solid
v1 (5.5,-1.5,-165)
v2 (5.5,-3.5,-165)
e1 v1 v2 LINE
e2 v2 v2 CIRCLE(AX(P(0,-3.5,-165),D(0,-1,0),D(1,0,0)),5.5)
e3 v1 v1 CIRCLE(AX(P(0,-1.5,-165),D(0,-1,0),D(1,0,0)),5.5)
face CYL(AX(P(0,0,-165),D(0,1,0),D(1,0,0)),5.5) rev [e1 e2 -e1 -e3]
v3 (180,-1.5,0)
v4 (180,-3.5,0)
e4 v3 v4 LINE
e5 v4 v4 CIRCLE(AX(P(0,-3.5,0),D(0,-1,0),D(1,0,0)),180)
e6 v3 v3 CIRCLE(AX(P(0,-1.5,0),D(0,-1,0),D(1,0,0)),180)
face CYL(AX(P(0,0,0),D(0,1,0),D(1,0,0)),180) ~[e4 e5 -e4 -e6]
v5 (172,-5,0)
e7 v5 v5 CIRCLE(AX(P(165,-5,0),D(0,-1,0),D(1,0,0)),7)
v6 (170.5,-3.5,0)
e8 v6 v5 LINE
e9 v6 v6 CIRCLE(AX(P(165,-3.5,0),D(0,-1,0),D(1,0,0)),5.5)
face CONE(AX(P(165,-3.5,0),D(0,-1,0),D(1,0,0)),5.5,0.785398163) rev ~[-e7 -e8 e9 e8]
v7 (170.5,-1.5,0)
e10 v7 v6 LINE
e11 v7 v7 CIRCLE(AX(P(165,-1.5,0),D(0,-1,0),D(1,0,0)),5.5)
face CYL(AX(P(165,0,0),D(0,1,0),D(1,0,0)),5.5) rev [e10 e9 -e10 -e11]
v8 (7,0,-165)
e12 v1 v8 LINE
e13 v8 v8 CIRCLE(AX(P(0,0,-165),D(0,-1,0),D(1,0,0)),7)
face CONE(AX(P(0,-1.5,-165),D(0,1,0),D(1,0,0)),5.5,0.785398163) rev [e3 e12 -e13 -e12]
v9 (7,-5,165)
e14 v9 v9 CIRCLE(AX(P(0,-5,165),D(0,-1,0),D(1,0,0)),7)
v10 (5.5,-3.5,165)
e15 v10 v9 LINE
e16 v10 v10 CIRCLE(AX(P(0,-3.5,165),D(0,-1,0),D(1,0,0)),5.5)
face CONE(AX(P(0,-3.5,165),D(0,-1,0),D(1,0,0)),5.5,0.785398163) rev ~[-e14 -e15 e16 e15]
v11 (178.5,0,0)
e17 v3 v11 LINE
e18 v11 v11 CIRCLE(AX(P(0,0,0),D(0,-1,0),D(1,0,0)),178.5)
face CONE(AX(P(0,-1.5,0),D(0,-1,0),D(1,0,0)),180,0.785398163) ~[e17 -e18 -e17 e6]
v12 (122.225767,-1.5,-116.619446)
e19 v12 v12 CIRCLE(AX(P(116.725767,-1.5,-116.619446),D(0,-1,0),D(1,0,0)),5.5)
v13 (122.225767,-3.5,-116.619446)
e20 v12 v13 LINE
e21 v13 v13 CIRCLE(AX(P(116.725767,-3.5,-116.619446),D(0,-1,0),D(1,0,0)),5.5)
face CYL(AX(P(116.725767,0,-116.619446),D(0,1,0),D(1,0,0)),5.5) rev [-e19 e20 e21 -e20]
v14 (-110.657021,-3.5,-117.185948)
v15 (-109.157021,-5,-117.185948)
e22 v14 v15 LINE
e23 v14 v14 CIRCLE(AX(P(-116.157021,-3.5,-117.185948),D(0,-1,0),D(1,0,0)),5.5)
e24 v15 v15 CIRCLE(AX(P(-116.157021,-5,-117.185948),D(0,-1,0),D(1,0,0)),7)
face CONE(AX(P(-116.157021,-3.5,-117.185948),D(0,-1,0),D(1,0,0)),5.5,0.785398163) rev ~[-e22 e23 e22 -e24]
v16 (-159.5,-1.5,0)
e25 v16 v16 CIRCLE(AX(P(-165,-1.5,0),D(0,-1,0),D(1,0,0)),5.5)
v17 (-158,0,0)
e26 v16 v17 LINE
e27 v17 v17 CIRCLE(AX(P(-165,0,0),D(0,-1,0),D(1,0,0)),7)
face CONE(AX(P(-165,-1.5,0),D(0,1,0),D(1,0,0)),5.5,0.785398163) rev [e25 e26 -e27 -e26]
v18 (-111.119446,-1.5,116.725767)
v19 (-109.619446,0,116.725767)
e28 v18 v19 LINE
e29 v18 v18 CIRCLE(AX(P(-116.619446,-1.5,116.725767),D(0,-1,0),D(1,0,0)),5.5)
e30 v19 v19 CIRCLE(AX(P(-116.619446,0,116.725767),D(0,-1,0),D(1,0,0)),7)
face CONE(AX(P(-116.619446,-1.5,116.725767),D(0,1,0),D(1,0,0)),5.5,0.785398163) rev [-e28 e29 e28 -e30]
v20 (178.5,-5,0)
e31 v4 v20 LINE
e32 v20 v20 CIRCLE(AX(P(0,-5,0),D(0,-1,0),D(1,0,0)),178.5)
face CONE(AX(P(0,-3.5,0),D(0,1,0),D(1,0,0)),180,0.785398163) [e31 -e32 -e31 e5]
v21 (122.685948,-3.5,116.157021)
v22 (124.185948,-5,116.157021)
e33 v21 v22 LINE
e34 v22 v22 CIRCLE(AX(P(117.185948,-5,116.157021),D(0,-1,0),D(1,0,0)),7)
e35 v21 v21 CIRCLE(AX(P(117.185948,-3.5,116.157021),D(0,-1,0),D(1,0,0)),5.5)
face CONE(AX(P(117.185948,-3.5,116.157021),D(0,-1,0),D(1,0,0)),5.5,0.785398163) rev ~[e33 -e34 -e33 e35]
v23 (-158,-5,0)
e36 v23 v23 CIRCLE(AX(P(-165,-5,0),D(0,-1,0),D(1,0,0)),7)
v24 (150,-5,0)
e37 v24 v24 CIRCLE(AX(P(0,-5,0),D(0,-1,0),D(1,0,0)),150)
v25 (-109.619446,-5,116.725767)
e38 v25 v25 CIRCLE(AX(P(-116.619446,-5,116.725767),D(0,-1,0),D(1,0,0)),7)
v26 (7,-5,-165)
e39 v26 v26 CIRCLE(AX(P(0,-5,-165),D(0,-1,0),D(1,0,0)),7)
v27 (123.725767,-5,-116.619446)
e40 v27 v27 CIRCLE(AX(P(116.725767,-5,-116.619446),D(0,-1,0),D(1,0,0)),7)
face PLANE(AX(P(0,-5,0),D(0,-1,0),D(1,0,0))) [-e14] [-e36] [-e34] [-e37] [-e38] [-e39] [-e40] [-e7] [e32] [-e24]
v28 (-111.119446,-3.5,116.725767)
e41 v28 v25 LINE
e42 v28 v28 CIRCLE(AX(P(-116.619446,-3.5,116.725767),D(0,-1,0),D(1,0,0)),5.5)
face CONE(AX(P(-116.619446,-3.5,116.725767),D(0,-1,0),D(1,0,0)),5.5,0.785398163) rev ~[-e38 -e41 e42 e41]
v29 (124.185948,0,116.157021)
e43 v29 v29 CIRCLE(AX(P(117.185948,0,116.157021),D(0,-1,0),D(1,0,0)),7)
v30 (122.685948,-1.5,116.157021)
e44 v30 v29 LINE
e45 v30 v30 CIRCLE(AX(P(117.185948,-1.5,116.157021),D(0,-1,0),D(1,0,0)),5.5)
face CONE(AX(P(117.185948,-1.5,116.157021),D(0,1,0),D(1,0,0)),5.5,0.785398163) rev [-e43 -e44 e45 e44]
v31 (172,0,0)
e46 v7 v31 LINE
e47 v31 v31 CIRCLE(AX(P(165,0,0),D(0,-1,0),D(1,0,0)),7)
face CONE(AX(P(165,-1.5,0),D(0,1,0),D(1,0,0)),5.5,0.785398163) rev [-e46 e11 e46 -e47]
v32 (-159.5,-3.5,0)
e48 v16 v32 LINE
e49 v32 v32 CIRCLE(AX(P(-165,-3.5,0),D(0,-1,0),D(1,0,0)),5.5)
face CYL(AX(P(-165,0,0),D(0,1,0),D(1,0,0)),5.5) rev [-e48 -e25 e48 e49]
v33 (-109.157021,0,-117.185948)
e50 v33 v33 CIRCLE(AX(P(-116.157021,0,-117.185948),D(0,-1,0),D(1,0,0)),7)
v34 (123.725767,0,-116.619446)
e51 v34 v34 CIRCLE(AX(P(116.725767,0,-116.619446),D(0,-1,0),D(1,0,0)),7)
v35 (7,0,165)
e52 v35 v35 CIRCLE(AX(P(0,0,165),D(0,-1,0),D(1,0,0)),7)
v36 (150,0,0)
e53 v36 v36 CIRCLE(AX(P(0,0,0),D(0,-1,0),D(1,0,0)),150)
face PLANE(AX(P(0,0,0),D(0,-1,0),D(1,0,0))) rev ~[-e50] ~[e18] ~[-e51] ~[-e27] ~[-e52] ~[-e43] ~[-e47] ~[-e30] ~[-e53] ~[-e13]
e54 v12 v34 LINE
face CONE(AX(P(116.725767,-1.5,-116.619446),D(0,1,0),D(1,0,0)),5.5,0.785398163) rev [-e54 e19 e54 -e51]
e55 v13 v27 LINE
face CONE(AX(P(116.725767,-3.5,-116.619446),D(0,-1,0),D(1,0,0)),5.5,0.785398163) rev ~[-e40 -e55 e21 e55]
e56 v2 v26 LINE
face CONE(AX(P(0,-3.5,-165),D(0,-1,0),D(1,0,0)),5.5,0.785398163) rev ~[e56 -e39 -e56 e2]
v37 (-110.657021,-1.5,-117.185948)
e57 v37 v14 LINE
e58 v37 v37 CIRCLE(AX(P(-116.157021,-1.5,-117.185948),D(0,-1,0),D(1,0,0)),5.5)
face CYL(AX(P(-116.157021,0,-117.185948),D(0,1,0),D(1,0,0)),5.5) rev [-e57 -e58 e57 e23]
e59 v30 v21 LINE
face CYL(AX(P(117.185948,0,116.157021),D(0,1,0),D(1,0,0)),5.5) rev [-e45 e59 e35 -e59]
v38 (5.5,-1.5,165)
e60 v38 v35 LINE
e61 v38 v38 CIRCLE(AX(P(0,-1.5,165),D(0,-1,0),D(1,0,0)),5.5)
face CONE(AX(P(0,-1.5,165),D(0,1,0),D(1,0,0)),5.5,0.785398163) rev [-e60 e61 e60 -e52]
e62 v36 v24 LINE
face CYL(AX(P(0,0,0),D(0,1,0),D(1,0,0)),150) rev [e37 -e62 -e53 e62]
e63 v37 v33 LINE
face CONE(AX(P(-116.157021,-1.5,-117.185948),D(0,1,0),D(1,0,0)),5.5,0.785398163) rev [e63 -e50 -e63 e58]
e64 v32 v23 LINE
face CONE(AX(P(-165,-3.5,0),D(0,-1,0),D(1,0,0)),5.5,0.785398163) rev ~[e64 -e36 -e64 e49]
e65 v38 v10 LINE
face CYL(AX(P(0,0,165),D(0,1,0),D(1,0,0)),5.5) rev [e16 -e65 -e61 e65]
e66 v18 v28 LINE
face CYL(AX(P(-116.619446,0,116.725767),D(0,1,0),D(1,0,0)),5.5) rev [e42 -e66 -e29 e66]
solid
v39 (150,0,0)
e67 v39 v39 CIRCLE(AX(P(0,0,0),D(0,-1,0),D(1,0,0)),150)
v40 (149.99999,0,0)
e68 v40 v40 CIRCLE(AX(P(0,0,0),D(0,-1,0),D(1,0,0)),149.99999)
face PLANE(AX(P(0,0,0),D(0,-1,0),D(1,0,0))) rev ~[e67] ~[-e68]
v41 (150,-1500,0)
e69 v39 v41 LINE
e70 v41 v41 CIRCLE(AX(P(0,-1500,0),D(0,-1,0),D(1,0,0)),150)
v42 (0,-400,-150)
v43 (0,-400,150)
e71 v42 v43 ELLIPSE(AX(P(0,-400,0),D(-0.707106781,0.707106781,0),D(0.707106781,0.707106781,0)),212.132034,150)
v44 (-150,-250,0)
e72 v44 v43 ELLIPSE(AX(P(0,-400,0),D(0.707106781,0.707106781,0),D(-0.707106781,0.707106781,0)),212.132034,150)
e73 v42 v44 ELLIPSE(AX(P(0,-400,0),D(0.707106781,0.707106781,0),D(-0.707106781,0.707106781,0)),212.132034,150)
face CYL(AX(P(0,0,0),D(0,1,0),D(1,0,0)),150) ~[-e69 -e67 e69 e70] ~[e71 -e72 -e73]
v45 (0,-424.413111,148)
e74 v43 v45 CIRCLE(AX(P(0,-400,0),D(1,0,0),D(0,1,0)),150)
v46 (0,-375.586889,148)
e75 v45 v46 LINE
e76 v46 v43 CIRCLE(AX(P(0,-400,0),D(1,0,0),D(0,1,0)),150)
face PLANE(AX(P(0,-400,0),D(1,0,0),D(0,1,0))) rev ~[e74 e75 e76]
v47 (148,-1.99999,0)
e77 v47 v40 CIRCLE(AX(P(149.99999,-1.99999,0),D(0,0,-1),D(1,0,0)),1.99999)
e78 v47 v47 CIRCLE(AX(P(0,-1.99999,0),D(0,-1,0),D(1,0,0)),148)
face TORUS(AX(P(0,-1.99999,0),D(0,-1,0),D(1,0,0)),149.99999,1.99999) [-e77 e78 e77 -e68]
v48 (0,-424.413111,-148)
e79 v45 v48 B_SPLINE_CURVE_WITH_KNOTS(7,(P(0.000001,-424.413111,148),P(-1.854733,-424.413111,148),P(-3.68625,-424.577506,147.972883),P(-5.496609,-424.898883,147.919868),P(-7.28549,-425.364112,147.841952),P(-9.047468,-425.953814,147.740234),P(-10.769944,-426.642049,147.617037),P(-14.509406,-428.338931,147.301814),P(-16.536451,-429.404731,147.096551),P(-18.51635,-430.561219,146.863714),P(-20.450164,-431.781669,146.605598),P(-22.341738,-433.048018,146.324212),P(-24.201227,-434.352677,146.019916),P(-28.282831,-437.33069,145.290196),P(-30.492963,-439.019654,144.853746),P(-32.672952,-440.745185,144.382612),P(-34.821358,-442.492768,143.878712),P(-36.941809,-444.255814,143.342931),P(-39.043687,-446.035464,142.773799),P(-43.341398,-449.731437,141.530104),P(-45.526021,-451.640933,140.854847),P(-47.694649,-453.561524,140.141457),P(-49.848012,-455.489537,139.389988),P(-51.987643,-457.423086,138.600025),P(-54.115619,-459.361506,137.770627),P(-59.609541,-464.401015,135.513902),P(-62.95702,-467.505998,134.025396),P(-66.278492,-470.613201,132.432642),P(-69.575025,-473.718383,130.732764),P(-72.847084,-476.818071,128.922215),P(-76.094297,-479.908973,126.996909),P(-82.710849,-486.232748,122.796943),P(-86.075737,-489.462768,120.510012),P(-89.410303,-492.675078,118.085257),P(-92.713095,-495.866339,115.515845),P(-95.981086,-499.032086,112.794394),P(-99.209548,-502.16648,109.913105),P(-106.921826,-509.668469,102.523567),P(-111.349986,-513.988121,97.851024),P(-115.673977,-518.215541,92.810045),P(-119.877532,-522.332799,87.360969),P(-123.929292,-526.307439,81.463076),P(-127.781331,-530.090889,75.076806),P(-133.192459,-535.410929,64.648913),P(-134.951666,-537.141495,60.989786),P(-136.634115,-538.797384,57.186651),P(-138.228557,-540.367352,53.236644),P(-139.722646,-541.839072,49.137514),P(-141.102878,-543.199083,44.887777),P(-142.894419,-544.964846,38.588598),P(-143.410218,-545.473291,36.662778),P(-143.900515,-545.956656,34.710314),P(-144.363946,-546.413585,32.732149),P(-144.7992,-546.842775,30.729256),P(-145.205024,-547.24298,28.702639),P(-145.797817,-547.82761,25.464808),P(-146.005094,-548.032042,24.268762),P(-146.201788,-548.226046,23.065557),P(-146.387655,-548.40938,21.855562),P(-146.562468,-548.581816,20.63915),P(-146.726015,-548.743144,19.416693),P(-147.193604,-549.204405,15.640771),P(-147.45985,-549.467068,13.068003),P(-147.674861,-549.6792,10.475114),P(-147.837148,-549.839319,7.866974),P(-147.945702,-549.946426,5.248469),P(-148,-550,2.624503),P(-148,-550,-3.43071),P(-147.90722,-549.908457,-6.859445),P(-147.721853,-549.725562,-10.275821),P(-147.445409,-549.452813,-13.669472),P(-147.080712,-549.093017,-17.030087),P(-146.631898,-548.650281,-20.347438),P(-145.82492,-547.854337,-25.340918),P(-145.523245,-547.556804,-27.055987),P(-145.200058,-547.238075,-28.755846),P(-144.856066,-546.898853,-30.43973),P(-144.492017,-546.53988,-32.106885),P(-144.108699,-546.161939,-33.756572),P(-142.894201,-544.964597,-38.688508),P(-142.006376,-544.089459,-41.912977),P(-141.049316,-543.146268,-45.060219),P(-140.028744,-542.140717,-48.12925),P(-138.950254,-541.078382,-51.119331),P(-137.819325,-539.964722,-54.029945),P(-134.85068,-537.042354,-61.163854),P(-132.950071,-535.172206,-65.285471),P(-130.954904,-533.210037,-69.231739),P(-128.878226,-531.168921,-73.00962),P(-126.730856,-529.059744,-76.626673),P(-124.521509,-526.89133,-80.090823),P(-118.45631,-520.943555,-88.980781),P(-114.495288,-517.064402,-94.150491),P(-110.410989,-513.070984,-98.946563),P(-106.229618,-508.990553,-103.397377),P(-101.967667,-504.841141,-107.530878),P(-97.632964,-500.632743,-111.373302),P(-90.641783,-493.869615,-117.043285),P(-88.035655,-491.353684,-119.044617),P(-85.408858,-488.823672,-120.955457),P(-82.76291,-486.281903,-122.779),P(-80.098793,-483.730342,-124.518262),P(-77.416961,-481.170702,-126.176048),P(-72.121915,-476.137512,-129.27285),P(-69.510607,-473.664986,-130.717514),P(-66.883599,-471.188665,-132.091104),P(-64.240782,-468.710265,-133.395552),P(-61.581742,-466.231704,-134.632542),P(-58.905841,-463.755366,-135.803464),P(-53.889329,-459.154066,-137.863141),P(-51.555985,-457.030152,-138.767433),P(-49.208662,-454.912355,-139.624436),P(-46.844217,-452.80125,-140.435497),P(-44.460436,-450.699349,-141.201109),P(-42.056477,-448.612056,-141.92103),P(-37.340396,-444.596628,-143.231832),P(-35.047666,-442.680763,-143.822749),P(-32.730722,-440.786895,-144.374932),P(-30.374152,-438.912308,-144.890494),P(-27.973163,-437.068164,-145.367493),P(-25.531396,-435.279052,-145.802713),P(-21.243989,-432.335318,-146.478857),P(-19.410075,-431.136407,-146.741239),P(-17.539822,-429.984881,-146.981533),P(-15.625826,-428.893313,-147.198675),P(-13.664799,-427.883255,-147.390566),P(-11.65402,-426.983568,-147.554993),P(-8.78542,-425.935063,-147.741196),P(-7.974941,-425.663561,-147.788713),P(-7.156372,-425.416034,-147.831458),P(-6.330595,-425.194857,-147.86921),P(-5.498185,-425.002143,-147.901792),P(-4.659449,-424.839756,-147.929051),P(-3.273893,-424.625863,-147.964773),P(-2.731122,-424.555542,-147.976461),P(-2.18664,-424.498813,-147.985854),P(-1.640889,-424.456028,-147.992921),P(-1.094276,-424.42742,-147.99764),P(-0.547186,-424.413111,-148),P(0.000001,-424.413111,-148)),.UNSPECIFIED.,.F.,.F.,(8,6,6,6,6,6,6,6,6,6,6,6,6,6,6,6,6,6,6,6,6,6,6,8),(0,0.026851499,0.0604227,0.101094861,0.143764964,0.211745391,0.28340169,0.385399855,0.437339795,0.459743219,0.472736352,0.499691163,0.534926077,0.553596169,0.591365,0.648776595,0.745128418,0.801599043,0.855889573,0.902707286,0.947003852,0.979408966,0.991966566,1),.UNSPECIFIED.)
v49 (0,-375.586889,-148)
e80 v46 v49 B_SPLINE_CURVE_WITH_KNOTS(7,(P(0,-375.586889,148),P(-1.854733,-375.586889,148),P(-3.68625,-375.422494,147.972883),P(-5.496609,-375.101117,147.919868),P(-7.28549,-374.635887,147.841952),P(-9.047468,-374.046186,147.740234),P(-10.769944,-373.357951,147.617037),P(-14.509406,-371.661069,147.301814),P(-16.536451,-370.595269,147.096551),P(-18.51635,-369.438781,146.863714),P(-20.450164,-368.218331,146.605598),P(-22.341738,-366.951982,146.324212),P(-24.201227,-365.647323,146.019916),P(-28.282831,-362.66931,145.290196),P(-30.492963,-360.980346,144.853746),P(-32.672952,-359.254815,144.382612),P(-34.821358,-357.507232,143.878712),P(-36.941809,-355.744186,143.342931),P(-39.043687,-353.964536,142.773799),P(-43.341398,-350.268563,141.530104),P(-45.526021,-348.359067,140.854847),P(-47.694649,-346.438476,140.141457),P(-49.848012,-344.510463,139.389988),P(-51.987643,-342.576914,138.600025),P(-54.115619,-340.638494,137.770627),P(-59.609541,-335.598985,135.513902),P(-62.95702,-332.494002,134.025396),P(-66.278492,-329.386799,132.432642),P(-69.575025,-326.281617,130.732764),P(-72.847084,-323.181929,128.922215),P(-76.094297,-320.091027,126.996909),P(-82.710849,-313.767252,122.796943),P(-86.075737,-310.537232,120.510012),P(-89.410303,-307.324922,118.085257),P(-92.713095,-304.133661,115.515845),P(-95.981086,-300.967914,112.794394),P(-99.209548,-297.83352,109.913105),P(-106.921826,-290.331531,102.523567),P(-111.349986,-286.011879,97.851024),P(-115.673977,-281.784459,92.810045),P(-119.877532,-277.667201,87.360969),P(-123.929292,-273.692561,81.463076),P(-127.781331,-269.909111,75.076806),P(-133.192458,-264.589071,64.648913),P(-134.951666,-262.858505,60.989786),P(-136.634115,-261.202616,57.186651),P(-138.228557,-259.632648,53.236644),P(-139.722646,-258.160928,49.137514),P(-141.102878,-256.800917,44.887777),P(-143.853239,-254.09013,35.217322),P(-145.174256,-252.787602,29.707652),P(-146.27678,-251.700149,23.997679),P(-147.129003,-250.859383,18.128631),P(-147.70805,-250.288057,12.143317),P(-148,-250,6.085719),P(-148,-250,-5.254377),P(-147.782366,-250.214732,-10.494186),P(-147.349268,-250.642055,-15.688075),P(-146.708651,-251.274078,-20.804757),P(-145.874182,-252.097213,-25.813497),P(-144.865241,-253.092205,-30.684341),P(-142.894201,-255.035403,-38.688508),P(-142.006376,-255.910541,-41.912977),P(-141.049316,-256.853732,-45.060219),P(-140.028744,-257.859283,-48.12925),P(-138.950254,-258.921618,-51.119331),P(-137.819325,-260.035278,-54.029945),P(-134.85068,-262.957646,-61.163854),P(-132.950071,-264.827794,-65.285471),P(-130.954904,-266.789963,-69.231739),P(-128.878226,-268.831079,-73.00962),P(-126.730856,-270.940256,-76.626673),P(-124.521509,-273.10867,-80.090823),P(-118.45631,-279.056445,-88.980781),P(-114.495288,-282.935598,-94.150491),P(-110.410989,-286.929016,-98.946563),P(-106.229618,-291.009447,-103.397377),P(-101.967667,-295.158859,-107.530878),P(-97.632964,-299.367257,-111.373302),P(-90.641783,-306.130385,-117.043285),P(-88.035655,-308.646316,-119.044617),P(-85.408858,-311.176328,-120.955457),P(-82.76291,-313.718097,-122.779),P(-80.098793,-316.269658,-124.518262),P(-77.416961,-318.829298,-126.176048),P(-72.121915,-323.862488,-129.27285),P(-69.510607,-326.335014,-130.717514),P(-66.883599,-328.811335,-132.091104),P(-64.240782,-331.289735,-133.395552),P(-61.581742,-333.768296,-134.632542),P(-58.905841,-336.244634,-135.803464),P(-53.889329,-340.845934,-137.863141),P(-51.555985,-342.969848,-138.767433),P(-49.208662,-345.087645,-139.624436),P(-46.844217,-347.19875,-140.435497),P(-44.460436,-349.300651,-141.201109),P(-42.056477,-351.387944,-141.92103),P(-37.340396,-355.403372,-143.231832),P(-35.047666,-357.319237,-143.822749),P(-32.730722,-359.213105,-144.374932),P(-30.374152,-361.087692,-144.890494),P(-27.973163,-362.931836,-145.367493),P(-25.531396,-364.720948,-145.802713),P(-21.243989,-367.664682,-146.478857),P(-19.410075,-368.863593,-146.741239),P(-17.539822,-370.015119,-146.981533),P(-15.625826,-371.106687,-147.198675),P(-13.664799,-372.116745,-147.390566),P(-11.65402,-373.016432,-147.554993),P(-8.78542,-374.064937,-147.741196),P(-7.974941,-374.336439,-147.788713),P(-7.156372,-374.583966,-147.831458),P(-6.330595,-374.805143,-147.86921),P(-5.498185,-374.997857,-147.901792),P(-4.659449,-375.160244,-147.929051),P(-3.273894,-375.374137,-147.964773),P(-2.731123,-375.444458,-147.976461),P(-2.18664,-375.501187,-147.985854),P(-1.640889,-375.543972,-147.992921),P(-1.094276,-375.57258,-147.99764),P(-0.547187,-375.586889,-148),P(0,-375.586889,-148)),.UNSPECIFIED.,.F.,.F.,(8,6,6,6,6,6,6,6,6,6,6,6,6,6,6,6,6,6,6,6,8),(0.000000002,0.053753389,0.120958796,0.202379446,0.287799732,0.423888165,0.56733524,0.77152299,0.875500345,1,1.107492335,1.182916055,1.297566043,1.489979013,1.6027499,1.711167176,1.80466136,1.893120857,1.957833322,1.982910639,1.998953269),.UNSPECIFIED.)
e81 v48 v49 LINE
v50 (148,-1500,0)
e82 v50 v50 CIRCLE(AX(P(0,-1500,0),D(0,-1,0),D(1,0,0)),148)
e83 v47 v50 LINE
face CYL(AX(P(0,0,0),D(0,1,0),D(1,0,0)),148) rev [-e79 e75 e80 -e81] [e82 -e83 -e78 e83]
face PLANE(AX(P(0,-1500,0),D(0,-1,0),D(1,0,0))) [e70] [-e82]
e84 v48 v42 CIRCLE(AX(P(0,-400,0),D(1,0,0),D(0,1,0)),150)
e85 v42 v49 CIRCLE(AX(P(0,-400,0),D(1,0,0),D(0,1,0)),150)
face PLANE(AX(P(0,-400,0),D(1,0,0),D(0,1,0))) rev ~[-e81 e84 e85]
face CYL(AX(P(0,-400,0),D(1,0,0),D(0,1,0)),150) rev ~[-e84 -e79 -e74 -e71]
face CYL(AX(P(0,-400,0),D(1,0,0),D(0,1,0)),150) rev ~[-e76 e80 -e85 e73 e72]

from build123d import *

# Parameters (mm, degrees)
F0_R     = 150
F0_R_2   = 148
F1_DEPTH = 1500
F0_R_3   = 180
F0_R_4   = 5.5
F2_DEPTH = 5
F3_R     = 1.99999
F4_SIZE  = 1.5
F5_R     = 150
F6_DEPTH = 180.001


# Not quite as in the source:
# - a fillet or chamfer is up to 0.001 mm smaller than in the source, because OpenCascade refuses the exact size


with BuildPart() as f1:
    # F0 (on Front) → F1 (new body)
    with BuildSketch(Plane.XZ):
        Circle(F0_R)
        Circle(F0_R_2, mode=Mode.SUBTRACT)
    extrude(amount=F1_DEPTH)

    # F3 (radius 2 in the source; OpenCascade refuses exactly that, so slightly less here)
    f3_edges = [f1.edges().sort_by_distance(p)[0] for p in [
        (-148, 0, 0),
    ]]
    fillet(f3_edges, radius=F3_R)

    # F5 (on Right) → F6 (cut, through all)
    with BuildSketch(Plane.YZ):
        with Locations((-400, 0)):
            Circle(F5_R)
    extrude(amount=-F6_DEPTH, mode=Mode.SUBTRACT)


with BuildPart() as f2:
    # F0 (on Front) → F2 (new body)
    with BuildSketch(Plane.XZ):
        Circle(F0_R_3)
        with Locations((-116.1570210146, -117.1859482576)):
            Circle(F0_R_4, mode=Mode.SUBTRACT)
        with Locations((0, -165)):
            Circle(F0_R_4, mode=Mode.SUBTRACT)
        with Locations((116.7257672626, -116.619446307)):
            Circle(F0_R_4, mode=Mode.SUBTRACT)
        with Locations((-165, 0)):
            Circle(F0_R_4, mode=Mode.SUBTRACT)
        with Locations((-116.619446307, 116.7257672626)):
            Circle(F0_R_4, mode=Mode.SUBTRACT)
        Circle(F0_R, mode=Mode.SUBTRACT)
        with Locations((165, 0)):
            Circle(F0_R_4, mode=Mode.SUBTRACT)
        with Locations((0, 165)):
            Circle(F0_R_4, mode=Mode.SUBTRACT)
        with Locations((117.1859482576, 116.1570210146)):
            Circle(F0_R_4, mode=Mode.SUBTRACT)
    extrude(amount=F2_DEPTH)

    # F4
    f4_edges = [f2.edges().sort_by_distance(p)[0] for p in [
        (-180, -5, 0),
        (-180, 0, 0),
        (159.5, 0, 0),
        (111.685948, 0, 116.157021),
        (111.685948, -5, 116.157021),
        (159.5, -5, 0),
        (111.225767, -5, -116.619446),
        (-121.657021, -5, -117.185948),
        (-170.5, -5, 0),
        (-122.119446, -5, 116.725767),
        (-5.5, -5, 165),
        (-121.657021, 0, -117.185948),
        (-170.5, 0, 0),
        (-122.119446, 0, 116.725767),
        (-5.5, 0, 165),
        (-5.5, 0, -165),
        (111.225767, 0, -116.619446),
        (-5.5, -5, -165),
    ]]
    chamfer(f4_edges, length=F4_SIZE)


solid = Compound([f1.part, f2.part])
